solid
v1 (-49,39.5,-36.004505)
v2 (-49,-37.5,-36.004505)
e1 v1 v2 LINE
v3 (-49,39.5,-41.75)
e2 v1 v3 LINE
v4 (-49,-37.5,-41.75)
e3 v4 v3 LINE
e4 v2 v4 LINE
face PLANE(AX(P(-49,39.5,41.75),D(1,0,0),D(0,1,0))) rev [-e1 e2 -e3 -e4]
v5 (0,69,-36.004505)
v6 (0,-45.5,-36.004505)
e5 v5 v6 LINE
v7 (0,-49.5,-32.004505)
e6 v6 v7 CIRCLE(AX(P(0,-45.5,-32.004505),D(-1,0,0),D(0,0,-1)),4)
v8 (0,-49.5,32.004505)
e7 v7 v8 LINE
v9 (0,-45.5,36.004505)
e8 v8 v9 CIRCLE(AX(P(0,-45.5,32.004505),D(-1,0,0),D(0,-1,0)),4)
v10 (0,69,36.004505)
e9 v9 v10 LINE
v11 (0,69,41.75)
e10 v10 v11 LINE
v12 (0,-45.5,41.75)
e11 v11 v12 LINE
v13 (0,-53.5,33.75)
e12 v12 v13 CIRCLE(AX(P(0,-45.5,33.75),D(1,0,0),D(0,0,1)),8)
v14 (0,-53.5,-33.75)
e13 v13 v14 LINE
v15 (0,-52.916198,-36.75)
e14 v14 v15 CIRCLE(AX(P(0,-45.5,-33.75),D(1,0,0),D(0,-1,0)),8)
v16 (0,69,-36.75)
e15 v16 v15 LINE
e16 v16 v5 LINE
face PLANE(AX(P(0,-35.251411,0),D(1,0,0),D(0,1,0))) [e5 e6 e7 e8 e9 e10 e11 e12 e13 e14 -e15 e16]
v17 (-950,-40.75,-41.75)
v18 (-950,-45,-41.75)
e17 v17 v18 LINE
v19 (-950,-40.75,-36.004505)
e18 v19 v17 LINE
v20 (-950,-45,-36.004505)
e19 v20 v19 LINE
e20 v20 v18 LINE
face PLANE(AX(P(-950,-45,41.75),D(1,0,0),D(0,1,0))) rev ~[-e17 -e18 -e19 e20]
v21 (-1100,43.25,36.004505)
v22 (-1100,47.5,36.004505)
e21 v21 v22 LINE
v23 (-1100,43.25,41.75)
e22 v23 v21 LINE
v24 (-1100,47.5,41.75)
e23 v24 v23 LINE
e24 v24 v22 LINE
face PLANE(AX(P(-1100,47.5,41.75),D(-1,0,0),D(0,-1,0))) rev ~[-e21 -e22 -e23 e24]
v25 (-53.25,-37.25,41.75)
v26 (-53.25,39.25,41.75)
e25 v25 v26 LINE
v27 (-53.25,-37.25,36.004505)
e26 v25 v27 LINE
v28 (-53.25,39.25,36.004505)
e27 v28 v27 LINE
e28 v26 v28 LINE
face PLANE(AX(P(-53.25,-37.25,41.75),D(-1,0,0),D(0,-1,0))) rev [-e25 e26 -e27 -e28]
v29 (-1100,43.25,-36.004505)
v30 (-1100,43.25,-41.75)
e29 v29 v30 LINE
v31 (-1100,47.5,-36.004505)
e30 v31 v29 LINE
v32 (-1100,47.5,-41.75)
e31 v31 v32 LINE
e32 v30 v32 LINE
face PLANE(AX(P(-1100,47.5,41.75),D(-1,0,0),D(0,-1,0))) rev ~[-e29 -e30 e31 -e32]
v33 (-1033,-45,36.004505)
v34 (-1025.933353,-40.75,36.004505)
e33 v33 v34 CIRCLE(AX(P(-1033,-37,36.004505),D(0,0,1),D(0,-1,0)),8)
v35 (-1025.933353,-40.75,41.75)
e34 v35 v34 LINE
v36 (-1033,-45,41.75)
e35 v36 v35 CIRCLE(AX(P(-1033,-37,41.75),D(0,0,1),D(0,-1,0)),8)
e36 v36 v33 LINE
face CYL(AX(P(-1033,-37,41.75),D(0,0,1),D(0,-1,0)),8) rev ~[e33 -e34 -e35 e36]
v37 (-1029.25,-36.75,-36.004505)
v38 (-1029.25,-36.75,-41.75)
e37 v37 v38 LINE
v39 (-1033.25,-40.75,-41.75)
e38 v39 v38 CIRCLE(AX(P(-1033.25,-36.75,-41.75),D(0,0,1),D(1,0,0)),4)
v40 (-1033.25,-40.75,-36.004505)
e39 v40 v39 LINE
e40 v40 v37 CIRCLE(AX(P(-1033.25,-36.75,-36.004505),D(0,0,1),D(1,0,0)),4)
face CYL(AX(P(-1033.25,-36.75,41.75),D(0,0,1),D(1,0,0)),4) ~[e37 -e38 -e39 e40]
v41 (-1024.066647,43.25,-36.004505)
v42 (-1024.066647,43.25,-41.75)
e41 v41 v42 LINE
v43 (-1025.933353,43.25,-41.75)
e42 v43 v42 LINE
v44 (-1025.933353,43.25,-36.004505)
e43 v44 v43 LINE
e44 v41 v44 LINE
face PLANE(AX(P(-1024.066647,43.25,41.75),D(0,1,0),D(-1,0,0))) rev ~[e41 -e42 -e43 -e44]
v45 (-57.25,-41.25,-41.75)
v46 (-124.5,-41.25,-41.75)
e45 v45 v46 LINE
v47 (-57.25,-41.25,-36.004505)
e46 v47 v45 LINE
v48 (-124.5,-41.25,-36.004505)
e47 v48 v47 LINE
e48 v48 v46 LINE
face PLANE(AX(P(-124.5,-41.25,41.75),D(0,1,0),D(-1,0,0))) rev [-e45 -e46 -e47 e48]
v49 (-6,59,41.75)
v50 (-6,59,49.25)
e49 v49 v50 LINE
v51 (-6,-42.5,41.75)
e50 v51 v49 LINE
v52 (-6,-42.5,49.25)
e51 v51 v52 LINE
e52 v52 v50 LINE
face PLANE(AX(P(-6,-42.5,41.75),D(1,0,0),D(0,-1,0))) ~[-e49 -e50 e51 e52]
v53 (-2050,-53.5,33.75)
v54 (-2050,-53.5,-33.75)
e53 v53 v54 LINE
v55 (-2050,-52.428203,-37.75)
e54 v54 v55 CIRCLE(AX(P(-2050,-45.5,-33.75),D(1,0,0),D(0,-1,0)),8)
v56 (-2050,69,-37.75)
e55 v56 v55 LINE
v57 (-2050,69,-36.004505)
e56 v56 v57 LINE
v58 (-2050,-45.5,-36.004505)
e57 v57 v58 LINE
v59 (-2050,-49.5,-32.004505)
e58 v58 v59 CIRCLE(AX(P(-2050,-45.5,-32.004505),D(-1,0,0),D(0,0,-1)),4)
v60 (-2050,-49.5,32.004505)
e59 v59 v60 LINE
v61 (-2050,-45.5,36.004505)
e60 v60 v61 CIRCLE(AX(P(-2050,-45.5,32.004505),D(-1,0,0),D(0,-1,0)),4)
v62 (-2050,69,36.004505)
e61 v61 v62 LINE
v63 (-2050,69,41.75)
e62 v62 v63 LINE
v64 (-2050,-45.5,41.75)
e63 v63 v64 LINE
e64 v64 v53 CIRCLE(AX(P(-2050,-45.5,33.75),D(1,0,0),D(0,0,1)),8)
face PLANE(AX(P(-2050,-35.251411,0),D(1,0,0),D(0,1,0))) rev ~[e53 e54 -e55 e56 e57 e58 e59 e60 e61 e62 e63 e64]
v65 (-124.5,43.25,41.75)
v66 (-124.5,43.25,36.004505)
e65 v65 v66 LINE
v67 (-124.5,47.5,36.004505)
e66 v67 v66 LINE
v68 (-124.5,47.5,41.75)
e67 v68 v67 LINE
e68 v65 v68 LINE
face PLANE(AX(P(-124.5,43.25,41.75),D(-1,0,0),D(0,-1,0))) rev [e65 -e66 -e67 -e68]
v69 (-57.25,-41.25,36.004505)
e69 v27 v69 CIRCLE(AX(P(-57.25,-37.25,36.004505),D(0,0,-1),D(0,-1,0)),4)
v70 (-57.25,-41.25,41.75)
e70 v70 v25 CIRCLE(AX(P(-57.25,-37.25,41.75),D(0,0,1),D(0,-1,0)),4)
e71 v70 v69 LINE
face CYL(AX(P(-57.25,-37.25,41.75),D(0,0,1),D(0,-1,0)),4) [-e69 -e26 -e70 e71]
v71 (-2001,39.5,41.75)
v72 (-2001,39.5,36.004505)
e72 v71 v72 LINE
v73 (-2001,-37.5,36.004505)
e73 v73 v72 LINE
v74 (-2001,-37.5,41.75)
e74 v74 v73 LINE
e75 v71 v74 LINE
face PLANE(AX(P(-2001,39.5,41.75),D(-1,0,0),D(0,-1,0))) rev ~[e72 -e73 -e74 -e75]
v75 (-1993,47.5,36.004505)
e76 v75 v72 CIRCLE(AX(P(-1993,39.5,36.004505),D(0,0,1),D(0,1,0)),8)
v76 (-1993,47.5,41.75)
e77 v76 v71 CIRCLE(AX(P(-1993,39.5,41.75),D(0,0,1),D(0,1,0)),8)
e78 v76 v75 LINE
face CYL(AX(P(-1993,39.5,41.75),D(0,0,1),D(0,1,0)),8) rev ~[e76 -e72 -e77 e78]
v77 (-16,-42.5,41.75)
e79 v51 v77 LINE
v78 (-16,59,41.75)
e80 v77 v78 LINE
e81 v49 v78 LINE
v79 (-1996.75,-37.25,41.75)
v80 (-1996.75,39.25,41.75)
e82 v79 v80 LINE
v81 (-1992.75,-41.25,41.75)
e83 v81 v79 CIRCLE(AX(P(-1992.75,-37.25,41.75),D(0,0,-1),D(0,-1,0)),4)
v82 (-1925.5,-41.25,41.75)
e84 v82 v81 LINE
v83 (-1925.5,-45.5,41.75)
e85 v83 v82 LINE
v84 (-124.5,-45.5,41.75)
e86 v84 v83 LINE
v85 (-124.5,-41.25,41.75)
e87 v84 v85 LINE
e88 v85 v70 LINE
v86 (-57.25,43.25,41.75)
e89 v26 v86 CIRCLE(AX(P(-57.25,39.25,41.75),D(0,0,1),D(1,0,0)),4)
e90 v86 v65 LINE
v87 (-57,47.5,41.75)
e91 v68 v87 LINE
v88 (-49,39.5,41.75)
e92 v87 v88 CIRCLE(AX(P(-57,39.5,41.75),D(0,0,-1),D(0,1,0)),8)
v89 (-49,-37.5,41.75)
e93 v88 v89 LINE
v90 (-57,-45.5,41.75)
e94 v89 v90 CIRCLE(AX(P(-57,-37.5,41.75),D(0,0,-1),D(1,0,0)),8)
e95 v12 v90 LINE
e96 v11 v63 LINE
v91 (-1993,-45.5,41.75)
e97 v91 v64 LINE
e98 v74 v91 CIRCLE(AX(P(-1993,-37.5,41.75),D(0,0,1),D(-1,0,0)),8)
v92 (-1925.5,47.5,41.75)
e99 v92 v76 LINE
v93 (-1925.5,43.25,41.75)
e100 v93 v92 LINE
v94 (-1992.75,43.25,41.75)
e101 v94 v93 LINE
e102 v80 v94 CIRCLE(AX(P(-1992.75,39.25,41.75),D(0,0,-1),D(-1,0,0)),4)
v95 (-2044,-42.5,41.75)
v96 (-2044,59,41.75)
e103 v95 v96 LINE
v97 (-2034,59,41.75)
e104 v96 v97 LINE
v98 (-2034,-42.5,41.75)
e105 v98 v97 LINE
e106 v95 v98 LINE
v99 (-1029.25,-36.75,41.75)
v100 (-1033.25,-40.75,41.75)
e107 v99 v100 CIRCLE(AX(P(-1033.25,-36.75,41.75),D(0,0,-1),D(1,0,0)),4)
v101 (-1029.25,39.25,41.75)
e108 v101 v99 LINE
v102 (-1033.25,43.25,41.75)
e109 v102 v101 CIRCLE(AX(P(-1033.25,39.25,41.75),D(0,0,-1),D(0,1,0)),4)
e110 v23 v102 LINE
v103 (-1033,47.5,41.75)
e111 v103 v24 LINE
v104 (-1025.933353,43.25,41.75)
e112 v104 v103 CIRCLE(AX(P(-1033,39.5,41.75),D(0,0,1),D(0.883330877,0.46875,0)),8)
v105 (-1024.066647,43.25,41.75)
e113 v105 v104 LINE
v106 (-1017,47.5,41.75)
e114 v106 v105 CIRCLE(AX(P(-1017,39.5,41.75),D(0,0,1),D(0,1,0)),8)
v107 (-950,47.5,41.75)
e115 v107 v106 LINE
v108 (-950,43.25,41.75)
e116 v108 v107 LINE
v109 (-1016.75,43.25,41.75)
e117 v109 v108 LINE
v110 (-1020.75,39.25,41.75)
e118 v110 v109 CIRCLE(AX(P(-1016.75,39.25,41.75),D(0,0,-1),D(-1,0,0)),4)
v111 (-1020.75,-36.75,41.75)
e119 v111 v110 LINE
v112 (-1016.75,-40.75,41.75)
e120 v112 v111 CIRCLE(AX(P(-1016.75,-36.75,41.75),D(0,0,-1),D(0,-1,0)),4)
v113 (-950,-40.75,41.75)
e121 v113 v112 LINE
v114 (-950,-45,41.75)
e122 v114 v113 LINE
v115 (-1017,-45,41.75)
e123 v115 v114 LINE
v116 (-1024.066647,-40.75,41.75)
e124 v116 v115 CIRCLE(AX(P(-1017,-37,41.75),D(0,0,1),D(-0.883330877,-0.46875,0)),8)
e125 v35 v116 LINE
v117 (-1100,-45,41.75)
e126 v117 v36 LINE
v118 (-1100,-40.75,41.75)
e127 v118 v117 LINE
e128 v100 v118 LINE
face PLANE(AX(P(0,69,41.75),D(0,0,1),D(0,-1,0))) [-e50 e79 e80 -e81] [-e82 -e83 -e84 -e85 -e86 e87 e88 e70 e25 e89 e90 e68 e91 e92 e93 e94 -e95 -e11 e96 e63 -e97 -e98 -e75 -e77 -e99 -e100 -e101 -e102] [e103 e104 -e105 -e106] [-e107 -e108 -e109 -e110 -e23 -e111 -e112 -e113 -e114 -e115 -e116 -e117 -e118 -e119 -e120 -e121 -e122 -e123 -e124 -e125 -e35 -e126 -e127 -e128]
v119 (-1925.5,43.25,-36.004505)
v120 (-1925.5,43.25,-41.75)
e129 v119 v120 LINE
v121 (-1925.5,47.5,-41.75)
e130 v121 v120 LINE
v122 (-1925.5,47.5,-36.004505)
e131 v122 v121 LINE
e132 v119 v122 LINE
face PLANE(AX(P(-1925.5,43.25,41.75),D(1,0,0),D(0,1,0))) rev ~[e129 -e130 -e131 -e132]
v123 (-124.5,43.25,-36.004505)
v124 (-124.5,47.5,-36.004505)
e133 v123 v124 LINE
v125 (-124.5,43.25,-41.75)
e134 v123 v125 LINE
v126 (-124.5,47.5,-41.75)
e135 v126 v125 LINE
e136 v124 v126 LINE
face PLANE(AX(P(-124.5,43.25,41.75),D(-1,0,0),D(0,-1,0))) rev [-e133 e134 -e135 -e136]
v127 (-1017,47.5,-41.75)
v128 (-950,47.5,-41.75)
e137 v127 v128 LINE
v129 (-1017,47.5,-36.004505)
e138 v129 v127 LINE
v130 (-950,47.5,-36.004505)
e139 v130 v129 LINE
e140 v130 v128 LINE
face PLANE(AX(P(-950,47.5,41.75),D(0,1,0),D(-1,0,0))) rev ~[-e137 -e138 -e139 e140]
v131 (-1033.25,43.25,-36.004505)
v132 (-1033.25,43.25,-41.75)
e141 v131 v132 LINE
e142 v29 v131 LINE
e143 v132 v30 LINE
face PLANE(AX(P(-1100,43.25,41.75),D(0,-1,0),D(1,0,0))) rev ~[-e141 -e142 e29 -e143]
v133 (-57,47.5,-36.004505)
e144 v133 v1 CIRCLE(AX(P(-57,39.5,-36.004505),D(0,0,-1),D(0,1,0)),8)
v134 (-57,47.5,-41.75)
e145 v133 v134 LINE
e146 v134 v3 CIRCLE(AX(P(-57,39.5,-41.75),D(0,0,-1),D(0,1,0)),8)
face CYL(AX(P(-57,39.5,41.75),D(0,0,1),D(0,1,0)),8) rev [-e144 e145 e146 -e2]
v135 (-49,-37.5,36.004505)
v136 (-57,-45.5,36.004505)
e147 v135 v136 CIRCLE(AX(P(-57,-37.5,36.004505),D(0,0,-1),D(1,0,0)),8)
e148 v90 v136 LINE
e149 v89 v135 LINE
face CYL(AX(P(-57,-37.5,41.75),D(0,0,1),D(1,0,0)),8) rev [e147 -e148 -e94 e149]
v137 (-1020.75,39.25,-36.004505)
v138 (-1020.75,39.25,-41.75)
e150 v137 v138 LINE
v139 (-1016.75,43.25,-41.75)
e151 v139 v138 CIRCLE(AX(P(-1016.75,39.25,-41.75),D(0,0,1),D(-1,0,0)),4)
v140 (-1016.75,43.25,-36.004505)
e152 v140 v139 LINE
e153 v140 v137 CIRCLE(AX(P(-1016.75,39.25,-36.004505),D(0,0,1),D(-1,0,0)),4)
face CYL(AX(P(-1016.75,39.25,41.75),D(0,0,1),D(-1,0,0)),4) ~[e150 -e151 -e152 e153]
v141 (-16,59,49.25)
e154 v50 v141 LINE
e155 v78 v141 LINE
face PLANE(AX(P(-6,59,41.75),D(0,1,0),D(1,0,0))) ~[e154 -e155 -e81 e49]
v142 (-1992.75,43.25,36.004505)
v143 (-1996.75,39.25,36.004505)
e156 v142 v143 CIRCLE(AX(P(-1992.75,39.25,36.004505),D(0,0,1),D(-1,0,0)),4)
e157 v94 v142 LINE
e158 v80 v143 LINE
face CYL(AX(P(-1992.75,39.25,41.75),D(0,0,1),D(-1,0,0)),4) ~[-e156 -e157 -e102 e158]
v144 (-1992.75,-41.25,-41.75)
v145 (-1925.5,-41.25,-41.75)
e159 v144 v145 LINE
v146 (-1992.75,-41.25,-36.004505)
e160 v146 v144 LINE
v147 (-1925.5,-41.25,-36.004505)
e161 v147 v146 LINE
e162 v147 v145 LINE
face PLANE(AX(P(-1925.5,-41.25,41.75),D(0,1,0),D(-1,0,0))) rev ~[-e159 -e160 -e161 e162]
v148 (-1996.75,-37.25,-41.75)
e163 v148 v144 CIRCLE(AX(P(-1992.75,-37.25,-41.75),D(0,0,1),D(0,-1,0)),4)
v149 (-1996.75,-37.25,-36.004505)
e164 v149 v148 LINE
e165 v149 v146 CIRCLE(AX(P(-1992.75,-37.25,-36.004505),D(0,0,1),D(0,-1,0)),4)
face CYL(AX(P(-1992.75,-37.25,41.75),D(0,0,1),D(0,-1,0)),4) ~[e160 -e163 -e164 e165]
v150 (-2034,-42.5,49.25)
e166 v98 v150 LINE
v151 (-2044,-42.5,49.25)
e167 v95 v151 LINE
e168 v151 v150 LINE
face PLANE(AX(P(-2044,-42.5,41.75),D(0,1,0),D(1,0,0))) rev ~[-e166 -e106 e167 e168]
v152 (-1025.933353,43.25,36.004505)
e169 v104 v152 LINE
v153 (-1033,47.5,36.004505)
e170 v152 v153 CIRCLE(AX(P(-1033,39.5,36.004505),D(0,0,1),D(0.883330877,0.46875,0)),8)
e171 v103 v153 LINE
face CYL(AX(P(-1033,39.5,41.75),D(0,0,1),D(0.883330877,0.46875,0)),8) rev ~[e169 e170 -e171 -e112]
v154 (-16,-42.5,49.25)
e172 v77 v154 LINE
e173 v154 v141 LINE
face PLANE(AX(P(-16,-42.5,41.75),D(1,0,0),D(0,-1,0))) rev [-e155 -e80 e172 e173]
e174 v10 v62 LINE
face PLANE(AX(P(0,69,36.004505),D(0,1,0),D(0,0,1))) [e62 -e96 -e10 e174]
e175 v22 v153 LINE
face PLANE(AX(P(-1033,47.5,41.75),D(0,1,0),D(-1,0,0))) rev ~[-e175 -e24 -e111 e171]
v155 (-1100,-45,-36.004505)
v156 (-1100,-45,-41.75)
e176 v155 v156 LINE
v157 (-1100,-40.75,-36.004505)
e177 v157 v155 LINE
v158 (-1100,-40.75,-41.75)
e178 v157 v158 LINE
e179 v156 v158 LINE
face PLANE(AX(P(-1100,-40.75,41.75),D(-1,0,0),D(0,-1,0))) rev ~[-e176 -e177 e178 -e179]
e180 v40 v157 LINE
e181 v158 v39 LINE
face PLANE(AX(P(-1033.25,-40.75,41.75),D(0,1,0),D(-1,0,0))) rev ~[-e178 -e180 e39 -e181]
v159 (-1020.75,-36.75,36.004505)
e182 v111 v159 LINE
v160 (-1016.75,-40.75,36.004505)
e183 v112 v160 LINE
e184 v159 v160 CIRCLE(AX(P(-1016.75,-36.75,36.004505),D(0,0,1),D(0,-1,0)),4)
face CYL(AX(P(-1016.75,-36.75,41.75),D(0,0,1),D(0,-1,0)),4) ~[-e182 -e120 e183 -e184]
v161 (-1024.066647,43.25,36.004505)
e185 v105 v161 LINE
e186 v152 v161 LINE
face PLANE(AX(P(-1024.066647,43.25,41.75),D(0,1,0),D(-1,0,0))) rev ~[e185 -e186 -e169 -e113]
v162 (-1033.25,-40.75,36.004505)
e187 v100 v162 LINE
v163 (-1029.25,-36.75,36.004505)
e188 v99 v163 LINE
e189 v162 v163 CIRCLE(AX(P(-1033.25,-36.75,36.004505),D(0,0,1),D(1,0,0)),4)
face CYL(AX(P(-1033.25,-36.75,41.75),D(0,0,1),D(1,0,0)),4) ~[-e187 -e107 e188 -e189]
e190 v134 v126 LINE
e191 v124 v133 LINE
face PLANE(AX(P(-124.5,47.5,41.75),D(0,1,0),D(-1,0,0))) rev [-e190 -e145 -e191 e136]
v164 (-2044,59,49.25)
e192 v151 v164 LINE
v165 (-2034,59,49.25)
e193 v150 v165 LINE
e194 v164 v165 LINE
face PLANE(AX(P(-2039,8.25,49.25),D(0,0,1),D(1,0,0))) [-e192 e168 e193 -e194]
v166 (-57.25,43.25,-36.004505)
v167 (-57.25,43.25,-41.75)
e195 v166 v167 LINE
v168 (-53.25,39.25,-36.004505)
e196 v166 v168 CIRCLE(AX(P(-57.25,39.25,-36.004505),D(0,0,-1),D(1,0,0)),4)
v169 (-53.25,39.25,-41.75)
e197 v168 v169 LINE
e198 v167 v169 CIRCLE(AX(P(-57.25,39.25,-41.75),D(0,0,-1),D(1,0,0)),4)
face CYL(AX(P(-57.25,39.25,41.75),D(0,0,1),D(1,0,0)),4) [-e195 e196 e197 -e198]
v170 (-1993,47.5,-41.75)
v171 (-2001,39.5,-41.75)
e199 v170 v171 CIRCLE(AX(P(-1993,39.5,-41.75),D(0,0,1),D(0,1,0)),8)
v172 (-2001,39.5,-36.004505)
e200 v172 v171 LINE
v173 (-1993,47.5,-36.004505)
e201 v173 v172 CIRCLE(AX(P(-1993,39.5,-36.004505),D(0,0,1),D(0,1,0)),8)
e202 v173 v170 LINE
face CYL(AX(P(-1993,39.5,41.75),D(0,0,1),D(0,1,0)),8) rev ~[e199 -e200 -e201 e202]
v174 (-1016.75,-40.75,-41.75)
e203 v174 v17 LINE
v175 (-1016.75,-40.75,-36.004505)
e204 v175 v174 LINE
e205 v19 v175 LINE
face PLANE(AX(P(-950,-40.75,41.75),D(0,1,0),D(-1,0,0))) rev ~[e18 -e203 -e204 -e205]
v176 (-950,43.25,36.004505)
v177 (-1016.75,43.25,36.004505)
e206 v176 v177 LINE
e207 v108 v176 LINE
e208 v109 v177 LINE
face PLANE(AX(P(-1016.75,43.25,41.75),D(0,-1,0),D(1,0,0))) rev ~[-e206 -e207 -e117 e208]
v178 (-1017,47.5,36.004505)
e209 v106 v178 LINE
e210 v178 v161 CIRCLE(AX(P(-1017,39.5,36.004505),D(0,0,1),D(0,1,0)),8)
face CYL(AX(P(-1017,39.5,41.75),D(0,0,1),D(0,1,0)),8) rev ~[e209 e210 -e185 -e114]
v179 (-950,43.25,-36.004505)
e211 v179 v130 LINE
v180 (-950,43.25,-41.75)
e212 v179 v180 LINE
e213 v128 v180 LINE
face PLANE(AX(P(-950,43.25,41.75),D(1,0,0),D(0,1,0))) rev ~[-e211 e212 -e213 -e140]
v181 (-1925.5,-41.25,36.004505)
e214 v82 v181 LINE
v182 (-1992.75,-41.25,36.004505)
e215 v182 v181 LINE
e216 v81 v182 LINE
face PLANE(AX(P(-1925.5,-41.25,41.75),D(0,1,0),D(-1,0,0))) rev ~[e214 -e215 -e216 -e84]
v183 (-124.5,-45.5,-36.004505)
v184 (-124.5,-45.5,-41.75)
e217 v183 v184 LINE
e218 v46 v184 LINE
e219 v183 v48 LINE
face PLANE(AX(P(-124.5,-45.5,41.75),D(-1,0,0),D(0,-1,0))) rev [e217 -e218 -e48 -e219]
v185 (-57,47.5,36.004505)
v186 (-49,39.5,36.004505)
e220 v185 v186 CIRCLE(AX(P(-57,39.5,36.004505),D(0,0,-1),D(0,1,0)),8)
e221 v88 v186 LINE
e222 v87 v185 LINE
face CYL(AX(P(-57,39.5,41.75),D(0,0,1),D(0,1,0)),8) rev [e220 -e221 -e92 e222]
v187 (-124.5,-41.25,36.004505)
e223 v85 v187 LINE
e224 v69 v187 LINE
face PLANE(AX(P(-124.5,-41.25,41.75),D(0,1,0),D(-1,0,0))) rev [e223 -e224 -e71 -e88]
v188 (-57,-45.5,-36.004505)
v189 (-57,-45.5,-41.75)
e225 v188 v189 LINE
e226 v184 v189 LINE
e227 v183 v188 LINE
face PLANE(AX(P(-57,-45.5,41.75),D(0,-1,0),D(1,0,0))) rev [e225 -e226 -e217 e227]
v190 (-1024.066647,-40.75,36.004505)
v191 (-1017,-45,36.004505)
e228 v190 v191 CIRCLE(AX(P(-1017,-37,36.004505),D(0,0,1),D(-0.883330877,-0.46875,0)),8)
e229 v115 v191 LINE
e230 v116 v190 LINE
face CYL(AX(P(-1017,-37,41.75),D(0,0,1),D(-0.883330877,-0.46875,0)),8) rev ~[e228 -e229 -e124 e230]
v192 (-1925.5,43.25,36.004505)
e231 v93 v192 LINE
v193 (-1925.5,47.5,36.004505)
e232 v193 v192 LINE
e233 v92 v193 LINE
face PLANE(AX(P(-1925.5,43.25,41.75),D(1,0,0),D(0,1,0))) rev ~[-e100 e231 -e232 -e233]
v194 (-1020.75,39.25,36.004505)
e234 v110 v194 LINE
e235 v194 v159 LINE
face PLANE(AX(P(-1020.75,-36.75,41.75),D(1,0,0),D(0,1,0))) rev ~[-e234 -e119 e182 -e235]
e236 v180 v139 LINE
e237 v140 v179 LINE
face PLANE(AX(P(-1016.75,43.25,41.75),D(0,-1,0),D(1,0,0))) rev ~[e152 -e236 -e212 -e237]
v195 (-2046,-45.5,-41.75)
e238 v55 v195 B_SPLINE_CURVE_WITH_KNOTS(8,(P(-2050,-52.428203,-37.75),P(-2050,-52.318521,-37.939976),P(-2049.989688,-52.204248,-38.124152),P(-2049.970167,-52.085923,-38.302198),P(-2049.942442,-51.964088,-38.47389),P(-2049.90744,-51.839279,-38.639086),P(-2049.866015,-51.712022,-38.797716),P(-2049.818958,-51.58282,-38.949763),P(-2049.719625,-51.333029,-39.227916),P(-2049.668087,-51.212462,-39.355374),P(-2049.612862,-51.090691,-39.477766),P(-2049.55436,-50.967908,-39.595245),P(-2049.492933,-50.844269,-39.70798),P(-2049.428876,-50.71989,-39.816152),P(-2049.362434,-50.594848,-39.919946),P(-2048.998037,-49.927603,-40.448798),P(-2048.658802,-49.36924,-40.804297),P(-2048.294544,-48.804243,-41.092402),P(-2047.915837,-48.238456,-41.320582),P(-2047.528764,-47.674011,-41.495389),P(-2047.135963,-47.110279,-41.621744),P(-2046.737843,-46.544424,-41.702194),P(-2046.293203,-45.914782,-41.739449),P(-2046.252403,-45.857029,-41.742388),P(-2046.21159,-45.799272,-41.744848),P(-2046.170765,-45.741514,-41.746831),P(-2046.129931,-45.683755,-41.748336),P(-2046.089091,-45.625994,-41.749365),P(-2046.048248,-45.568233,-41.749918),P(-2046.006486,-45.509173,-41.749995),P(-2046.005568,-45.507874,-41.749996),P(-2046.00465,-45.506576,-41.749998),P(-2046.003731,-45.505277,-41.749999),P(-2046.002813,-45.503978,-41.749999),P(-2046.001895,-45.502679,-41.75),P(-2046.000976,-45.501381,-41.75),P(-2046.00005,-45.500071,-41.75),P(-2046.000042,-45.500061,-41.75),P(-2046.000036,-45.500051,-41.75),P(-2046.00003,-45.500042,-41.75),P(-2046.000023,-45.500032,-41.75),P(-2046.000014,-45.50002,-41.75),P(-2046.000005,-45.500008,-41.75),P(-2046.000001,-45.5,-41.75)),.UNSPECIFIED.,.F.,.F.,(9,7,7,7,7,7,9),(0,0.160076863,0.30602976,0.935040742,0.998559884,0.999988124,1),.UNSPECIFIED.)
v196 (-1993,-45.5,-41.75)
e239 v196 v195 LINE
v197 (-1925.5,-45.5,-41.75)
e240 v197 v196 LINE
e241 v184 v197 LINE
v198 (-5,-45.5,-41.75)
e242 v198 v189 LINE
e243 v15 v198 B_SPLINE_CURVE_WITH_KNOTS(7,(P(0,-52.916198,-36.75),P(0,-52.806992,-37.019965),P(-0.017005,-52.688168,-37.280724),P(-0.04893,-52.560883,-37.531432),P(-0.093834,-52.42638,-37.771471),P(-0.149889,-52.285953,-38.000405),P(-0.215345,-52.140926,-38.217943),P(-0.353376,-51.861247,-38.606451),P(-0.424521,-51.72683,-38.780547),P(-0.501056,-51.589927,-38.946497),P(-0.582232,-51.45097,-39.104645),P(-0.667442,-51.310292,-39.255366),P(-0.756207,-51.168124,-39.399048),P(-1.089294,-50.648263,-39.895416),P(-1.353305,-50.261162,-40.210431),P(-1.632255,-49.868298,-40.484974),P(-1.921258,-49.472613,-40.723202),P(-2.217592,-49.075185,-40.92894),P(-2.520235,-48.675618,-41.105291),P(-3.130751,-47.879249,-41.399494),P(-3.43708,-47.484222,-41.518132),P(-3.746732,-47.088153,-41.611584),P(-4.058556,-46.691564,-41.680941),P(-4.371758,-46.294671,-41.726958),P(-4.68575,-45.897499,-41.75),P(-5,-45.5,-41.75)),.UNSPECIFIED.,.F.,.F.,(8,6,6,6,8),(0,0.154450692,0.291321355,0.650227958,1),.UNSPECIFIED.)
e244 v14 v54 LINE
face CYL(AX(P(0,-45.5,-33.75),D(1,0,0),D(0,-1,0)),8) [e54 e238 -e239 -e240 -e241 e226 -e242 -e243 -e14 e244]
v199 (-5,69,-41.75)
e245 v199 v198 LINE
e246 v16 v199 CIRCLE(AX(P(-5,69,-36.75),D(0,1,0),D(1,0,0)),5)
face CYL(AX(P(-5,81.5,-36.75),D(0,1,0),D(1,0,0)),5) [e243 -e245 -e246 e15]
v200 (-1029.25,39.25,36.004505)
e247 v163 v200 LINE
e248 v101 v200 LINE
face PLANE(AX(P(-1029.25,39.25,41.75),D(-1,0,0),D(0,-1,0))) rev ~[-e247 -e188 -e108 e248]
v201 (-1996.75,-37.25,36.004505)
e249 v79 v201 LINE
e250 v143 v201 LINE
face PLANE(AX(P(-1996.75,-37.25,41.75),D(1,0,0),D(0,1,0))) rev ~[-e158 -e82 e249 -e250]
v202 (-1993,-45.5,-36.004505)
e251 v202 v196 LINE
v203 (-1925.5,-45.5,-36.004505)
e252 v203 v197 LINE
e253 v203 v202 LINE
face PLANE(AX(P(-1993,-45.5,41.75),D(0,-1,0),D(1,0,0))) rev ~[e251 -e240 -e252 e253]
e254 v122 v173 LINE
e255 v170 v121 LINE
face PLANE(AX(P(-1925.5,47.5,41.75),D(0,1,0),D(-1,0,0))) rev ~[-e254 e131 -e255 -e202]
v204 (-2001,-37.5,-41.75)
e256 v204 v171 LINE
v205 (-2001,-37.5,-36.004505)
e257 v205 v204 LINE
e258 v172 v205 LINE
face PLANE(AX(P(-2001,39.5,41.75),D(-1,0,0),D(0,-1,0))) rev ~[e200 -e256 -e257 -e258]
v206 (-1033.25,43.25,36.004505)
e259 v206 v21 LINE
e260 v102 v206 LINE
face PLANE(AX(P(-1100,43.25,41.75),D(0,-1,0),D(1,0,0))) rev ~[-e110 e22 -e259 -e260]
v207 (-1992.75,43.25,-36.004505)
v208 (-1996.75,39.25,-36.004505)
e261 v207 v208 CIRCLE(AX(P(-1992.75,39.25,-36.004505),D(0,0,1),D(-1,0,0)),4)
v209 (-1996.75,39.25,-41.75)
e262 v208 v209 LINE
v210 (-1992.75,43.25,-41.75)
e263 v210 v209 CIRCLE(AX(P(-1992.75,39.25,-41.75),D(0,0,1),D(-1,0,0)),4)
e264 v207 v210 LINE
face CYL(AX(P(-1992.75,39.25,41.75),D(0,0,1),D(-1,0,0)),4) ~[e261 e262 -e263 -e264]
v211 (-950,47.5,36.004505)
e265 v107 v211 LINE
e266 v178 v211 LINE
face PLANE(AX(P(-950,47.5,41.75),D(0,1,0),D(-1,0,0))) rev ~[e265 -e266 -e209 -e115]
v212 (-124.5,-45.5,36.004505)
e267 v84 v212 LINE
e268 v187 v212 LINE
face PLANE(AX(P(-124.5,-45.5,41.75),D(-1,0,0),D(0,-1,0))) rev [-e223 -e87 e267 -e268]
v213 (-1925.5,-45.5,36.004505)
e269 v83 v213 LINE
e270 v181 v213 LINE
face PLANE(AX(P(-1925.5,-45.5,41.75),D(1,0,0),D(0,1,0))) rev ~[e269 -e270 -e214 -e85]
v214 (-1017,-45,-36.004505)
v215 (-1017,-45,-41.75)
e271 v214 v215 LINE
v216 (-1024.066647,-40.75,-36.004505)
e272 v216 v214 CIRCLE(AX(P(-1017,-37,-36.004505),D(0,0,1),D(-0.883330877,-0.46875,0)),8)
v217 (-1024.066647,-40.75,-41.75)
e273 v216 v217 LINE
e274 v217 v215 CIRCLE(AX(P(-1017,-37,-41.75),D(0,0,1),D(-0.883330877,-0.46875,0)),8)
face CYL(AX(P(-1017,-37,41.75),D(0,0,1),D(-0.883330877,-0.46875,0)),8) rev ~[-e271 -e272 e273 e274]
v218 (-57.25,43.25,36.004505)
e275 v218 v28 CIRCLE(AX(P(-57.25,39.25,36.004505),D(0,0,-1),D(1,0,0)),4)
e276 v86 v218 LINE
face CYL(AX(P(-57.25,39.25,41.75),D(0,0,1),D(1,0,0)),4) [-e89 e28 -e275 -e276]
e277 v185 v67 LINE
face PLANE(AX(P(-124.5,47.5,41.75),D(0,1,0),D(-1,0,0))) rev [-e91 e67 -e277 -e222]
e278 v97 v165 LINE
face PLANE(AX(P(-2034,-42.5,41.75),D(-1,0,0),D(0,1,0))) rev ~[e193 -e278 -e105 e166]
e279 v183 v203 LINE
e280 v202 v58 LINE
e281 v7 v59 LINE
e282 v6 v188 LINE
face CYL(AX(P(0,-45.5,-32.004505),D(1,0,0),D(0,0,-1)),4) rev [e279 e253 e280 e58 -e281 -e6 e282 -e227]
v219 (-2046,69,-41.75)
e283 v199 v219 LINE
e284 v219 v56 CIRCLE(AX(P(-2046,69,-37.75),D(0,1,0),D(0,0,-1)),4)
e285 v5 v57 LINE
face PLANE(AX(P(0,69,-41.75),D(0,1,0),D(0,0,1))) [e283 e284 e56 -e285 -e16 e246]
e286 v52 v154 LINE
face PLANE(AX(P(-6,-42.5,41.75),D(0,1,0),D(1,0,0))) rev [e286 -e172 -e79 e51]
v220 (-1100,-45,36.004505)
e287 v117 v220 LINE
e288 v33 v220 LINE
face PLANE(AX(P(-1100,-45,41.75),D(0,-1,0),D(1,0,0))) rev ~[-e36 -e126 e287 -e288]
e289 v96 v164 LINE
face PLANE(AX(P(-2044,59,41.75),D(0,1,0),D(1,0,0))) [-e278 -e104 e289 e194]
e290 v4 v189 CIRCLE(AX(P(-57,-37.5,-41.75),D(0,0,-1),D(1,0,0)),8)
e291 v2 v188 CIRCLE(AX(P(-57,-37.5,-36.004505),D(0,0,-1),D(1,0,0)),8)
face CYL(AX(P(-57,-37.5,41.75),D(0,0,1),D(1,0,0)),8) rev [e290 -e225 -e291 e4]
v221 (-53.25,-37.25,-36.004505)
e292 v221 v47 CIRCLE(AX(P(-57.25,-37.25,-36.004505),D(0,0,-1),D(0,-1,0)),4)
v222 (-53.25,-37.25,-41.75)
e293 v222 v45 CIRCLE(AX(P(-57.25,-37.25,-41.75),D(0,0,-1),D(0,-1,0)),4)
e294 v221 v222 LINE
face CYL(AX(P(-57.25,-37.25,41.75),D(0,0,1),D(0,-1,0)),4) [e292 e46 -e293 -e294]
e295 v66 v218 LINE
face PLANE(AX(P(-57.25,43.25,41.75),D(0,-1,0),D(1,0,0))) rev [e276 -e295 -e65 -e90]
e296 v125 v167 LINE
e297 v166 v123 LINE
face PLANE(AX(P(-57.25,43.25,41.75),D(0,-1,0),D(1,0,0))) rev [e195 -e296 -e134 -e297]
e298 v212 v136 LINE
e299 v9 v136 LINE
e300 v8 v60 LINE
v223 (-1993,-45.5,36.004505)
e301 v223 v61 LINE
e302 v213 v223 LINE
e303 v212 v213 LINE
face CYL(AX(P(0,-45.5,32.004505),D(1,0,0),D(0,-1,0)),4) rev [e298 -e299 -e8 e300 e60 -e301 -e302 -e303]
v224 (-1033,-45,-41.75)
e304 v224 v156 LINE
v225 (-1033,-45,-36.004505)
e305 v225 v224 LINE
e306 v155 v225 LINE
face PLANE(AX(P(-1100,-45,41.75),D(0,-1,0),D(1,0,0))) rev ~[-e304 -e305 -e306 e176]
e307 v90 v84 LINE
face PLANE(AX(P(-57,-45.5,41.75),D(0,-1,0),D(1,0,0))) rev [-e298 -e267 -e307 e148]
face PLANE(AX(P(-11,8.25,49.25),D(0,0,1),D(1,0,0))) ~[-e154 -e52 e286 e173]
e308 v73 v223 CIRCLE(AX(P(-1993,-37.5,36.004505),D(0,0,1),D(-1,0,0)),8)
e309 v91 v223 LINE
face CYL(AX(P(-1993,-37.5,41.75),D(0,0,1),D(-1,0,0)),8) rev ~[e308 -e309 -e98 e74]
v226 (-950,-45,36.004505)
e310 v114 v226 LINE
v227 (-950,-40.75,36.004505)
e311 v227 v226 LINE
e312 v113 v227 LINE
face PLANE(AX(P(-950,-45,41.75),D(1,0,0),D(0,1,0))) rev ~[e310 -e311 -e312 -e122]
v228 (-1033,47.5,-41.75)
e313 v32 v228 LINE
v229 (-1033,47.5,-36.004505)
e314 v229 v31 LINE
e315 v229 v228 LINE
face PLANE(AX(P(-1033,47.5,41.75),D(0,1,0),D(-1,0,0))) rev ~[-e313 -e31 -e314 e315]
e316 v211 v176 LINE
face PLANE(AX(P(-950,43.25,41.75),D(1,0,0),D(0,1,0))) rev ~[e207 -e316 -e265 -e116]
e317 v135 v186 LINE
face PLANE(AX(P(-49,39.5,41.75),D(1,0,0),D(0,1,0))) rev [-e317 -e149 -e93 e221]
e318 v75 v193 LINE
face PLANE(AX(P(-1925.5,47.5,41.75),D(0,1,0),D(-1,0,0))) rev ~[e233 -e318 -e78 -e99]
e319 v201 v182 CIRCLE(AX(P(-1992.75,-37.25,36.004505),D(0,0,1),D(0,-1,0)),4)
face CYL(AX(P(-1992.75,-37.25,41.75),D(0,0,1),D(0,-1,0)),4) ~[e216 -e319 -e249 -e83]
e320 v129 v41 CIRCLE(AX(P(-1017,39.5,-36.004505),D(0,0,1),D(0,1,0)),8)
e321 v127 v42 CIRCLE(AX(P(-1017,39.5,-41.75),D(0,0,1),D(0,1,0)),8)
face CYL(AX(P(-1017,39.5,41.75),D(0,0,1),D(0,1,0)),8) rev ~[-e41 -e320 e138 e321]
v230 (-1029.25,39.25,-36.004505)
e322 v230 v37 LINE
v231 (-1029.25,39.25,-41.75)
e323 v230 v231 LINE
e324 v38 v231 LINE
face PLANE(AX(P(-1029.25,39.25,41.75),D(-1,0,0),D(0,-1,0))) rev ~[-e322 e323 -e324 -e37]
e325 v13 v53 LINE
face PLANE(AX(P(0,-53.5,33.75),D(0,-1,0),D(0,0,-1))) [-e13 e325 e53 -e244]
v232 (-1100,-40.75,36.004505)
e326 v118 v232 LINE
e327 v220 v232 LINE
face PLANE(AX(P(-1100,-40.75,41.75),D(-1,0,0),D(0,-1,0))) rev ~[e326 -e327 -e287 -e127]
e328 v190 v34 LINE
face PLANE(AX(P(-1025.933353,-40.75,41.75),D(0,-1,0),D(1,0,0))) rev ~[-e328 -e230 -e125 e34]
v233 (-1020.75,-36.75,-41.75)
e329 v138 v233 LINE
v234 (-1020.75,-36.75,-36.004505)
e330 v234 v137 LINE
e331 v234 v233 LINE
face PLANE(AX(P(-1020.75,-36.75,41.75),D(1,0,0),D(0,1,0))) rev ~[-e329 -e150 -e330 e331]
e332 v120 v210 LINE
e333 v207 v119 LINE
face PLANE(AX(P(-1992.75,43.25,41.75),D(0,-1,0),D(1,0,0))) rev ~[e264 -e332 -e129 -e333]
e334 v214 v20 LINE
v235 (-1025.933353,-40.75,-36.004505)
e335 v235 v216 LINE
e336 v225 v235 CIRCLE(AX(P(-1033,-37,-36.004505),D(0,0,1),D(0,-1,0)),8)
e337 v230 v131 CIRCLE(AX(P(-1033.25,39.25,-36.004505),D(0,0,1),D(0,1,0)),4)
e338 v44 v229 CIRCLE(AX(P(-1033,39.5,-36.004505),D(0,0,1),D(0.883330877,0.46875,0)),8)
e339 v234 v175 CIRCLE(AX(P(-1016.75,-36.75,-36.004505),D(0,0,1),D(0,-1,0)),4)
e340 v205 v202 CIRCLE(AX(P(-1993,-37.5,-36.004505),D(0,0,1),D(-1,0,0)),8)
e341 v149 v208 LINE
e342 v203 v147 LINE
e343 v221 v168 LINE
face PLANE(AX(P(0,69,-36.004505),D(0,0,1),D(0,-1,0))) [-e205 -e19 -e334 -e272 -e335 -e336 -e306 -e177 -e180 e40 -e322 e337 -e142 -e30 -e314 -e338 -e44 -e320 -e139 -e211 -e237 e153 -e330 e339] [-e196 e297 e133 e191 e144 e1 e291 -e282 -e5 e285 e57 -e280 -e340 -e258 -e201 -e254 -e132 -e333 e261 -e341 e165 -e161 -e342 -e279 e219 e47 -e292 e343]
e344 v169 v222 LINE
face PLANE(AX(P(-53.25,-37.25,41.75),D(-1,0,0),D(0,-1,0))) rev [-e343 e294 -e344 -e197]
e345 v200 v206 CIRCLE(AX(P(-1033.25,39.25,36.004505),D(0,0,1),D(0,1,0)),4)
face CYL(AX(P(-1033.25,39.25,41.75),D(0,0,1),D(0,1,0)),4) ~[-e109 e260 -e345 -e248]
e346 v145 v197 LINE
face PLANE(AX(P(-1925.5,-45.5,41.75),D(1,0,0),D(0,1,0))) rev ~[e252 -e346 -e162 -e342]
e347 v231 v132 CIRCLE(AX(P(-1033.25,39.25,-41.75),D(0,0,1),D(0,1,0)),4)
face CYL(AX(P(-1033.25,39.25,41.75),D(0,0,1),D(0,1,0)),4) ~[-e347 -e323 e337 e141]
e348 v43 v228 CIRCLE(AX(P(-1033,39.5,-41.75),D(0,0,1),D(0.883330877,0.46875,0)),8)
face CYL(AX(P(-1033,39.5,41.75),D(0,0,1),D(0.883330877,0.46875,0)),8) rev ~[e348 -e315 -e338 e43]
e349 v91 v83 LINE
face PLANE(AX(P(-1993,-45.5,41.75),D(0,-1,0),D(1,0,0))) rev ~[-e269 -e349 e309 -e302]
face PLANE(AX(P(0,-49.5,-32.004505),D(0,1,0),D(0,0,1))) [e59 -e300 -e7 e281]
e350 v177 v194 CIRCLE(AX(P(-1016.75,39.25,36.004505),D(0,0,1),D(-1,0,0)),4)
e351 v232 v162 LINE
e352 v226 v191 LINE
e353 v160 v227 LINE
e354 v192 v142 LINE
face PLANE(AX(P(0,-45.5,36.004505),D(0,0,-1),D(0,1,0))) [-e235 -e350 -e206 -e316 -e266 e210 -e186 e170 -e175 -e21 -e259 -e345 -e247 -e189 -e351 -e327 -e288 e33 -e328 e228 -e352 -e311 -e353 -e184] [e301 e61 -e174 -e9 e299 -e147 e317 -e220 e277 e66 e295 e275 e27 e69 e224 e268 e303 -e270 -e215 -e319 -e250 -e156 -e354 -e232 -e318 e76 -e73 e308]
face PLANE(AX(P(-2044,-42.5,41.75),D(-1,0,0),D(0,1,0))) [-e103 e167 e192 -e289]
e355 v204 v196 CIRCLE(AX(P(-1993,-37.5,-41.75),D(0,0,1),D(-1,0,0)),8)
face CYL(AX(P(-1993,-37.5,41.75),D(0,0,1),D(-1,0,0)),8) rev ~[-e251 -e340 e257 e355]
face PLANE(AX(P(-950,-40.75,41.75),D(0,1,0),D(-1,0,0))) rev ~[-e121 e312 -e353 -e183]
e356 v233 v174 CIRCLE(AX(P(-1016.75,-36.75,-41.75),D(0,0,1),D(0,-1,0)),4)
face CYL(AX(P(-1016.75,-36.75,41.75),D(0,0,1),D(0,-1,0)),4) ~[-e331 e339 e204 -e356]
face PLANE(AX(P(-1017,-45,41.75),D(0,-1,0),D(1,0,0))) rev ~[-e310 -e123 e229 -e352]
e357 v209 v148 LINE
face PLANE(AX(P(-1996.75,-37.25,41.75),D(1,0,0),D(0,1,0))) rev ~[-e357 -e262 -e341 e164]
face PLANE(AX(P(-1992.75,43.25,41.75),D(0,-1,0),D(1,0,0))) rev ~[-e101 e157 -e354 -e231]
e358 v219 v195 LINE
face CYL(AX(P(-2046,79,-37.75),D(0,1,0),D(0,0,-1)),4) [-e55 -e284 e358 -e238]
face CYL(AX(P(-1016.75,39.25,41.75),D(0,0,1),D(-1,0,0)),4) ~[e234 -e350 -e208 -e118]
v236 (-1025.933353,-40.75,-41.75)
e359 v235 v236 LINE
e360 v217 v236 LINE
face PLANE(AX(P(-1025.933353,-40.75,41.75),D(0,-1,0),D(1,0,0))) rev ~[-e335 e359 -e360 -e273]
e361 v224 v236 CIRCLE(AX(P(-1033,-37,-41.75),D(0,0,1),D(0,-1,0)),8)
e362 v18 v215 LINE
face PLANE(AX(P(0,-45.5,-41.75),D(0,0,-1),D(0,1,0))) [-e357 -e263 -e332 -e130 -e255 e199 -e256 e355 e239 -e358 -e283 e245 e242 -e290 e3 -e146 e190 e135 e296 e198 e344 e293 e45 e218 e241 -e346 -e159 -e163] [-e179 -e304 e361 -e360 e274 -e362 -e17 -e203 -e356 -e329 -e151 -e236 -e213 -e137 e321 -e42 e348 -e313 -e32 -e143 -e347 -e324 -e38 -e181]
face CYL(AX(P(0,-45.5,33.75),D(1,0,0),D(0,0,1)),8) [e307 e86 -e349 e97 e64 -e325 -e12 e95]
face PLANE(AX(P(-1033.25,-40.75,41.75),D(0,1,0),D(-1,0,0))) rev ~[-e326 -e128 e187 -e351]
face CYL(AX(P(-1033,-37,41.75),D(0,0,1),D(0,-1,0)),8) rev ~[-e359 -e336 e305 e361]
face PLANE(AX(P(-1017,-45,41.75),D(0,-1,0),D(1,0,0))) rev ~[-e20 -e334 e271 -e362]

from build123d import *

# Parameters (mm, degrees)
F0_W         = 69
F0_H         = 5.7454954955
F1_DEPTH     = 2050
F2_W         = 10
F2_H         = 101.5
F3_DEPTH     = 7.5
F7_DEPTH     = 84
F10_DEPTH    = 90
F11_T1_DEPTH = 134.5
F12_T1_DEPTH = 139.5


# Not quite as in the source:
# - a fillet or chamfer that OpenCascade refuses, or shapes differently, is made with other operations: its cross-section is extruded or revolved along the edge and cut away or added


with BuildPart() as f1:
    # F0 (on Right) → F1 (new body)
    with BuildSketch(Plane.YZ):
        with BuildLine():
            ThreePointArc((-53.5, -33.75), (-51.1568542495, -39.4068542495), (-45.5, -41.75))
            Line((-45.5, -41.75), (0, -41.75))
            Line((0, -41.75), (0, -36.0045045045))
            Line((0, -36.0045045045), (-45.5, -36.0045045045))
            ThreePointArc((-45.5, -36.0045045045), (-48.3284271247, -34.8329316293), (-49.5, -32.0045045045))
            Line((-49.5, -32.0045045045), (-49.5, 32.0045045045))
            ThreePointArc((-49.5, 32.0045045045), (-48.3284271247, 34.8329316293), (-45.5, 36.0045045045))
            Line((-45.5, 36.0045045045), (0, 36.0045045045))
            Line((0, 36.0045045045), (0, 41.75))
            Line((0, 41.75), (-45.5, 41.75))
            ThreePointArc((-45.5, 41.75), (-51.1568542495, 39.4068542495), (-53.5, 33.75))
            Line((-53.5, 33.75), (-53.5, -33.75))
        make_face()
        with Locations((34.5, 38.8772522523)):
            Rectangle(F0_W, F0_H)
        with Locations((34.5, -38.8772522523)):
            Rectangle(F0_W, F0_H)
    extrude(amount=-F1_DEPTH)

    # F2 (on face) → F3 (join)
    with BuildSketch(Plane.XY.offset(41.75)):
        with Locations((-2039, 8.25)):
            Rectangle(F2_W, F2_H)
    extrude(amount=F3_DEPTH)

    # F5: F1 across plane


with BuildPart() as f1_1:
    add(f1.part)
    add(f1.part.mirror(Plane.YZ.offset(-1025)))

    # F6 (on face) → F7 (cut)
    with BuildSketch(Plane.XY.offset(41.75)):
        with BuildLine():
            Line((-2001, 39.5), (-2001, 0))
            Line((-2001, 0), (-2001, -37.5))
            ThreePointArc((-2001, -37.5), (-1998.6568542495, -43.1568542495), (-1993, -45.5))
            Line((-1993, -45.5), (-1925.5, -45.5))
            Line((-1925.5, -45.5), (-1925.5, -41.25))
            Line((-1925.5, -41.25), (-1984.9698543549, -41.25))
            Line((-1984.9698543549, -41.25), (-1992.75, -41.25))
            ThreePointArc((-1992.75, -41.25), (-1995.5784271247, -40.0784271247), (-1996.75, -37.25))
            Line((-1996.75, -37.25), (-1996.75, 0))
            Line((-1996.75, 0), (-1996.75, 39.25))
            ThreePointArc((-1996.75, 39.25), (-1995.5784271247, 42.0784271247), (-1992.75, 43.25))
            Line((-1992.75, 43.25), (-1925.5, 43.25))
            Line((-1925.5, 43.25), (-1925.5, 47.5))
            Line((-1925.5, 47.5), (-1993, 47.5))
            ThreePointArc((-1993, 47.5), (-1998.6568542495, 45.1568542495), (-2001, 39.5))
        make_face()
    extrude(amount=-F7_DEPTH, mode=Mode.SUBTRACT)

    # F8: F1 across plane


with BuildPart() as f1_2:
    add(f1_1.part)
    add(f1_1.part.mirror(Plane.YZ.offset(-1025)), mode=Mode.INTERSECT)

    # F9 (on face) → F10 (cut)
    with BuildSketch(Plane.XY.offset(41.75)):
        with BuildLine():
            ThreePointArc((-1024.0666470126, -40.75), (-1021.1231056256, -43.8556546004), (-1017, -45))
            Line((-1017, -45), (-950, -45))
            Line((-950, -45), (-950, -40.75))
            Line((-950, -40.75), (-1016.75, -40.75))
            ThreePointArc((-1016.75, -40.75), (-1019.5784271247, -39.5784271247), (-1020.75, -36.75))
            Line((-1020.75, -36.75), (-1020.75, 1.25))
            Line((-1020.75, 1.25), (-1020.75, 39.25))
            ThreePointArc((-1020.75, 39.25), (-1019.5784271247, 42.0784271247), (-1016.75, 43.25))
            Line((-1016.75, 43.25), (-950, 43.25))
            Line((-950, 43.25), (-950, 47.5))
            Line((-950, 47.5), (-1017, 47.5))
            ThreePointArc((-1017, 47.5), (-1021.1231056256, 46.3556546004), (-1024.0666470126, 43.25))
            Line((-1024.0666470126, 43.25), (-1025.9333529874, 43.25))
            ThreePointArc((-1025.9333529874, 43.25), (-1028.8768943744, 46.3556546004), (-1033, 47.5))
            Line((-1033, 47.5), (-1100, 47.5))
            Line((-1100, 47.5), (-1100, 43.25))
            Line((-1100, 43.25), (-1033.25, 43.25))
            ThreePointArc((-1033.25, 43.25), (-1030.4215728753, 42.0784271247), (-1029.25, 39.25))
            Line((-1029.25, 39.25), (-1029.25, 1.25))
            Line((-1029.25, 1.25), (-1029.25, -36.75))
            ThreePointArc((-1029.25, -36.75), (-1030.4215728753, -39.5784271247), (-1033.25, -40.75))
            Line((-1033.25, -40.75), (-1100, -40.75))
            Line((-1100, -40.75), (-1100, -45))
            Line((-1100, -45), (-1033, -45))
            ThreePointArc((-1033, -45), (-1028.8768943744, -43.8556546004), (-1025.9333529874, -40.75))
            Line((-1025.9333529874, -40.75), (-1024.0666470126, -40.75))
        make_face()
    extrude(amount=-F10_DEPTH, mode=Mode.SUBTRACT)

    # F11: fillet of radius 4 on 1 edges, made by hand

    # F11_s2 → F11_t1 (cut)
    with BuildSketch(Plane.XZ.offset(-79)):
        with BuildLine():
            ThreePointArc((-2046, -41.75), (-2048.8284271247, -40.5784271247), (-2050, -37.75))
            Line((-2050, -37.75), (-2050, -41.75))
            Line((-2050, -41.75), (-2046, -41.75))
        make_face()
    extrude(amount=F11_T1_DEPTH, mode=Mode.SUBTRACT)

    # F12: fillet of radius 5 on 1 edges, made by hand

    # F12_s2 → F12_t1 (cut)
    with BuildSketch(Plane.XZ.offset(-81.5)):
        with BuildLine():
            ThreePointArc((0, -36.75), (-1.4644660941, -40.2855339059), (-5, -41.75))
            Line((-5, -41.75), (0, -41.75))
            Line((0, -41.75), (0, -36.75))
        make_face()
    extrude(amount=F12_T1_DEPTH, mode=Mode.SUBTRACT)


solid = f1_2.part
